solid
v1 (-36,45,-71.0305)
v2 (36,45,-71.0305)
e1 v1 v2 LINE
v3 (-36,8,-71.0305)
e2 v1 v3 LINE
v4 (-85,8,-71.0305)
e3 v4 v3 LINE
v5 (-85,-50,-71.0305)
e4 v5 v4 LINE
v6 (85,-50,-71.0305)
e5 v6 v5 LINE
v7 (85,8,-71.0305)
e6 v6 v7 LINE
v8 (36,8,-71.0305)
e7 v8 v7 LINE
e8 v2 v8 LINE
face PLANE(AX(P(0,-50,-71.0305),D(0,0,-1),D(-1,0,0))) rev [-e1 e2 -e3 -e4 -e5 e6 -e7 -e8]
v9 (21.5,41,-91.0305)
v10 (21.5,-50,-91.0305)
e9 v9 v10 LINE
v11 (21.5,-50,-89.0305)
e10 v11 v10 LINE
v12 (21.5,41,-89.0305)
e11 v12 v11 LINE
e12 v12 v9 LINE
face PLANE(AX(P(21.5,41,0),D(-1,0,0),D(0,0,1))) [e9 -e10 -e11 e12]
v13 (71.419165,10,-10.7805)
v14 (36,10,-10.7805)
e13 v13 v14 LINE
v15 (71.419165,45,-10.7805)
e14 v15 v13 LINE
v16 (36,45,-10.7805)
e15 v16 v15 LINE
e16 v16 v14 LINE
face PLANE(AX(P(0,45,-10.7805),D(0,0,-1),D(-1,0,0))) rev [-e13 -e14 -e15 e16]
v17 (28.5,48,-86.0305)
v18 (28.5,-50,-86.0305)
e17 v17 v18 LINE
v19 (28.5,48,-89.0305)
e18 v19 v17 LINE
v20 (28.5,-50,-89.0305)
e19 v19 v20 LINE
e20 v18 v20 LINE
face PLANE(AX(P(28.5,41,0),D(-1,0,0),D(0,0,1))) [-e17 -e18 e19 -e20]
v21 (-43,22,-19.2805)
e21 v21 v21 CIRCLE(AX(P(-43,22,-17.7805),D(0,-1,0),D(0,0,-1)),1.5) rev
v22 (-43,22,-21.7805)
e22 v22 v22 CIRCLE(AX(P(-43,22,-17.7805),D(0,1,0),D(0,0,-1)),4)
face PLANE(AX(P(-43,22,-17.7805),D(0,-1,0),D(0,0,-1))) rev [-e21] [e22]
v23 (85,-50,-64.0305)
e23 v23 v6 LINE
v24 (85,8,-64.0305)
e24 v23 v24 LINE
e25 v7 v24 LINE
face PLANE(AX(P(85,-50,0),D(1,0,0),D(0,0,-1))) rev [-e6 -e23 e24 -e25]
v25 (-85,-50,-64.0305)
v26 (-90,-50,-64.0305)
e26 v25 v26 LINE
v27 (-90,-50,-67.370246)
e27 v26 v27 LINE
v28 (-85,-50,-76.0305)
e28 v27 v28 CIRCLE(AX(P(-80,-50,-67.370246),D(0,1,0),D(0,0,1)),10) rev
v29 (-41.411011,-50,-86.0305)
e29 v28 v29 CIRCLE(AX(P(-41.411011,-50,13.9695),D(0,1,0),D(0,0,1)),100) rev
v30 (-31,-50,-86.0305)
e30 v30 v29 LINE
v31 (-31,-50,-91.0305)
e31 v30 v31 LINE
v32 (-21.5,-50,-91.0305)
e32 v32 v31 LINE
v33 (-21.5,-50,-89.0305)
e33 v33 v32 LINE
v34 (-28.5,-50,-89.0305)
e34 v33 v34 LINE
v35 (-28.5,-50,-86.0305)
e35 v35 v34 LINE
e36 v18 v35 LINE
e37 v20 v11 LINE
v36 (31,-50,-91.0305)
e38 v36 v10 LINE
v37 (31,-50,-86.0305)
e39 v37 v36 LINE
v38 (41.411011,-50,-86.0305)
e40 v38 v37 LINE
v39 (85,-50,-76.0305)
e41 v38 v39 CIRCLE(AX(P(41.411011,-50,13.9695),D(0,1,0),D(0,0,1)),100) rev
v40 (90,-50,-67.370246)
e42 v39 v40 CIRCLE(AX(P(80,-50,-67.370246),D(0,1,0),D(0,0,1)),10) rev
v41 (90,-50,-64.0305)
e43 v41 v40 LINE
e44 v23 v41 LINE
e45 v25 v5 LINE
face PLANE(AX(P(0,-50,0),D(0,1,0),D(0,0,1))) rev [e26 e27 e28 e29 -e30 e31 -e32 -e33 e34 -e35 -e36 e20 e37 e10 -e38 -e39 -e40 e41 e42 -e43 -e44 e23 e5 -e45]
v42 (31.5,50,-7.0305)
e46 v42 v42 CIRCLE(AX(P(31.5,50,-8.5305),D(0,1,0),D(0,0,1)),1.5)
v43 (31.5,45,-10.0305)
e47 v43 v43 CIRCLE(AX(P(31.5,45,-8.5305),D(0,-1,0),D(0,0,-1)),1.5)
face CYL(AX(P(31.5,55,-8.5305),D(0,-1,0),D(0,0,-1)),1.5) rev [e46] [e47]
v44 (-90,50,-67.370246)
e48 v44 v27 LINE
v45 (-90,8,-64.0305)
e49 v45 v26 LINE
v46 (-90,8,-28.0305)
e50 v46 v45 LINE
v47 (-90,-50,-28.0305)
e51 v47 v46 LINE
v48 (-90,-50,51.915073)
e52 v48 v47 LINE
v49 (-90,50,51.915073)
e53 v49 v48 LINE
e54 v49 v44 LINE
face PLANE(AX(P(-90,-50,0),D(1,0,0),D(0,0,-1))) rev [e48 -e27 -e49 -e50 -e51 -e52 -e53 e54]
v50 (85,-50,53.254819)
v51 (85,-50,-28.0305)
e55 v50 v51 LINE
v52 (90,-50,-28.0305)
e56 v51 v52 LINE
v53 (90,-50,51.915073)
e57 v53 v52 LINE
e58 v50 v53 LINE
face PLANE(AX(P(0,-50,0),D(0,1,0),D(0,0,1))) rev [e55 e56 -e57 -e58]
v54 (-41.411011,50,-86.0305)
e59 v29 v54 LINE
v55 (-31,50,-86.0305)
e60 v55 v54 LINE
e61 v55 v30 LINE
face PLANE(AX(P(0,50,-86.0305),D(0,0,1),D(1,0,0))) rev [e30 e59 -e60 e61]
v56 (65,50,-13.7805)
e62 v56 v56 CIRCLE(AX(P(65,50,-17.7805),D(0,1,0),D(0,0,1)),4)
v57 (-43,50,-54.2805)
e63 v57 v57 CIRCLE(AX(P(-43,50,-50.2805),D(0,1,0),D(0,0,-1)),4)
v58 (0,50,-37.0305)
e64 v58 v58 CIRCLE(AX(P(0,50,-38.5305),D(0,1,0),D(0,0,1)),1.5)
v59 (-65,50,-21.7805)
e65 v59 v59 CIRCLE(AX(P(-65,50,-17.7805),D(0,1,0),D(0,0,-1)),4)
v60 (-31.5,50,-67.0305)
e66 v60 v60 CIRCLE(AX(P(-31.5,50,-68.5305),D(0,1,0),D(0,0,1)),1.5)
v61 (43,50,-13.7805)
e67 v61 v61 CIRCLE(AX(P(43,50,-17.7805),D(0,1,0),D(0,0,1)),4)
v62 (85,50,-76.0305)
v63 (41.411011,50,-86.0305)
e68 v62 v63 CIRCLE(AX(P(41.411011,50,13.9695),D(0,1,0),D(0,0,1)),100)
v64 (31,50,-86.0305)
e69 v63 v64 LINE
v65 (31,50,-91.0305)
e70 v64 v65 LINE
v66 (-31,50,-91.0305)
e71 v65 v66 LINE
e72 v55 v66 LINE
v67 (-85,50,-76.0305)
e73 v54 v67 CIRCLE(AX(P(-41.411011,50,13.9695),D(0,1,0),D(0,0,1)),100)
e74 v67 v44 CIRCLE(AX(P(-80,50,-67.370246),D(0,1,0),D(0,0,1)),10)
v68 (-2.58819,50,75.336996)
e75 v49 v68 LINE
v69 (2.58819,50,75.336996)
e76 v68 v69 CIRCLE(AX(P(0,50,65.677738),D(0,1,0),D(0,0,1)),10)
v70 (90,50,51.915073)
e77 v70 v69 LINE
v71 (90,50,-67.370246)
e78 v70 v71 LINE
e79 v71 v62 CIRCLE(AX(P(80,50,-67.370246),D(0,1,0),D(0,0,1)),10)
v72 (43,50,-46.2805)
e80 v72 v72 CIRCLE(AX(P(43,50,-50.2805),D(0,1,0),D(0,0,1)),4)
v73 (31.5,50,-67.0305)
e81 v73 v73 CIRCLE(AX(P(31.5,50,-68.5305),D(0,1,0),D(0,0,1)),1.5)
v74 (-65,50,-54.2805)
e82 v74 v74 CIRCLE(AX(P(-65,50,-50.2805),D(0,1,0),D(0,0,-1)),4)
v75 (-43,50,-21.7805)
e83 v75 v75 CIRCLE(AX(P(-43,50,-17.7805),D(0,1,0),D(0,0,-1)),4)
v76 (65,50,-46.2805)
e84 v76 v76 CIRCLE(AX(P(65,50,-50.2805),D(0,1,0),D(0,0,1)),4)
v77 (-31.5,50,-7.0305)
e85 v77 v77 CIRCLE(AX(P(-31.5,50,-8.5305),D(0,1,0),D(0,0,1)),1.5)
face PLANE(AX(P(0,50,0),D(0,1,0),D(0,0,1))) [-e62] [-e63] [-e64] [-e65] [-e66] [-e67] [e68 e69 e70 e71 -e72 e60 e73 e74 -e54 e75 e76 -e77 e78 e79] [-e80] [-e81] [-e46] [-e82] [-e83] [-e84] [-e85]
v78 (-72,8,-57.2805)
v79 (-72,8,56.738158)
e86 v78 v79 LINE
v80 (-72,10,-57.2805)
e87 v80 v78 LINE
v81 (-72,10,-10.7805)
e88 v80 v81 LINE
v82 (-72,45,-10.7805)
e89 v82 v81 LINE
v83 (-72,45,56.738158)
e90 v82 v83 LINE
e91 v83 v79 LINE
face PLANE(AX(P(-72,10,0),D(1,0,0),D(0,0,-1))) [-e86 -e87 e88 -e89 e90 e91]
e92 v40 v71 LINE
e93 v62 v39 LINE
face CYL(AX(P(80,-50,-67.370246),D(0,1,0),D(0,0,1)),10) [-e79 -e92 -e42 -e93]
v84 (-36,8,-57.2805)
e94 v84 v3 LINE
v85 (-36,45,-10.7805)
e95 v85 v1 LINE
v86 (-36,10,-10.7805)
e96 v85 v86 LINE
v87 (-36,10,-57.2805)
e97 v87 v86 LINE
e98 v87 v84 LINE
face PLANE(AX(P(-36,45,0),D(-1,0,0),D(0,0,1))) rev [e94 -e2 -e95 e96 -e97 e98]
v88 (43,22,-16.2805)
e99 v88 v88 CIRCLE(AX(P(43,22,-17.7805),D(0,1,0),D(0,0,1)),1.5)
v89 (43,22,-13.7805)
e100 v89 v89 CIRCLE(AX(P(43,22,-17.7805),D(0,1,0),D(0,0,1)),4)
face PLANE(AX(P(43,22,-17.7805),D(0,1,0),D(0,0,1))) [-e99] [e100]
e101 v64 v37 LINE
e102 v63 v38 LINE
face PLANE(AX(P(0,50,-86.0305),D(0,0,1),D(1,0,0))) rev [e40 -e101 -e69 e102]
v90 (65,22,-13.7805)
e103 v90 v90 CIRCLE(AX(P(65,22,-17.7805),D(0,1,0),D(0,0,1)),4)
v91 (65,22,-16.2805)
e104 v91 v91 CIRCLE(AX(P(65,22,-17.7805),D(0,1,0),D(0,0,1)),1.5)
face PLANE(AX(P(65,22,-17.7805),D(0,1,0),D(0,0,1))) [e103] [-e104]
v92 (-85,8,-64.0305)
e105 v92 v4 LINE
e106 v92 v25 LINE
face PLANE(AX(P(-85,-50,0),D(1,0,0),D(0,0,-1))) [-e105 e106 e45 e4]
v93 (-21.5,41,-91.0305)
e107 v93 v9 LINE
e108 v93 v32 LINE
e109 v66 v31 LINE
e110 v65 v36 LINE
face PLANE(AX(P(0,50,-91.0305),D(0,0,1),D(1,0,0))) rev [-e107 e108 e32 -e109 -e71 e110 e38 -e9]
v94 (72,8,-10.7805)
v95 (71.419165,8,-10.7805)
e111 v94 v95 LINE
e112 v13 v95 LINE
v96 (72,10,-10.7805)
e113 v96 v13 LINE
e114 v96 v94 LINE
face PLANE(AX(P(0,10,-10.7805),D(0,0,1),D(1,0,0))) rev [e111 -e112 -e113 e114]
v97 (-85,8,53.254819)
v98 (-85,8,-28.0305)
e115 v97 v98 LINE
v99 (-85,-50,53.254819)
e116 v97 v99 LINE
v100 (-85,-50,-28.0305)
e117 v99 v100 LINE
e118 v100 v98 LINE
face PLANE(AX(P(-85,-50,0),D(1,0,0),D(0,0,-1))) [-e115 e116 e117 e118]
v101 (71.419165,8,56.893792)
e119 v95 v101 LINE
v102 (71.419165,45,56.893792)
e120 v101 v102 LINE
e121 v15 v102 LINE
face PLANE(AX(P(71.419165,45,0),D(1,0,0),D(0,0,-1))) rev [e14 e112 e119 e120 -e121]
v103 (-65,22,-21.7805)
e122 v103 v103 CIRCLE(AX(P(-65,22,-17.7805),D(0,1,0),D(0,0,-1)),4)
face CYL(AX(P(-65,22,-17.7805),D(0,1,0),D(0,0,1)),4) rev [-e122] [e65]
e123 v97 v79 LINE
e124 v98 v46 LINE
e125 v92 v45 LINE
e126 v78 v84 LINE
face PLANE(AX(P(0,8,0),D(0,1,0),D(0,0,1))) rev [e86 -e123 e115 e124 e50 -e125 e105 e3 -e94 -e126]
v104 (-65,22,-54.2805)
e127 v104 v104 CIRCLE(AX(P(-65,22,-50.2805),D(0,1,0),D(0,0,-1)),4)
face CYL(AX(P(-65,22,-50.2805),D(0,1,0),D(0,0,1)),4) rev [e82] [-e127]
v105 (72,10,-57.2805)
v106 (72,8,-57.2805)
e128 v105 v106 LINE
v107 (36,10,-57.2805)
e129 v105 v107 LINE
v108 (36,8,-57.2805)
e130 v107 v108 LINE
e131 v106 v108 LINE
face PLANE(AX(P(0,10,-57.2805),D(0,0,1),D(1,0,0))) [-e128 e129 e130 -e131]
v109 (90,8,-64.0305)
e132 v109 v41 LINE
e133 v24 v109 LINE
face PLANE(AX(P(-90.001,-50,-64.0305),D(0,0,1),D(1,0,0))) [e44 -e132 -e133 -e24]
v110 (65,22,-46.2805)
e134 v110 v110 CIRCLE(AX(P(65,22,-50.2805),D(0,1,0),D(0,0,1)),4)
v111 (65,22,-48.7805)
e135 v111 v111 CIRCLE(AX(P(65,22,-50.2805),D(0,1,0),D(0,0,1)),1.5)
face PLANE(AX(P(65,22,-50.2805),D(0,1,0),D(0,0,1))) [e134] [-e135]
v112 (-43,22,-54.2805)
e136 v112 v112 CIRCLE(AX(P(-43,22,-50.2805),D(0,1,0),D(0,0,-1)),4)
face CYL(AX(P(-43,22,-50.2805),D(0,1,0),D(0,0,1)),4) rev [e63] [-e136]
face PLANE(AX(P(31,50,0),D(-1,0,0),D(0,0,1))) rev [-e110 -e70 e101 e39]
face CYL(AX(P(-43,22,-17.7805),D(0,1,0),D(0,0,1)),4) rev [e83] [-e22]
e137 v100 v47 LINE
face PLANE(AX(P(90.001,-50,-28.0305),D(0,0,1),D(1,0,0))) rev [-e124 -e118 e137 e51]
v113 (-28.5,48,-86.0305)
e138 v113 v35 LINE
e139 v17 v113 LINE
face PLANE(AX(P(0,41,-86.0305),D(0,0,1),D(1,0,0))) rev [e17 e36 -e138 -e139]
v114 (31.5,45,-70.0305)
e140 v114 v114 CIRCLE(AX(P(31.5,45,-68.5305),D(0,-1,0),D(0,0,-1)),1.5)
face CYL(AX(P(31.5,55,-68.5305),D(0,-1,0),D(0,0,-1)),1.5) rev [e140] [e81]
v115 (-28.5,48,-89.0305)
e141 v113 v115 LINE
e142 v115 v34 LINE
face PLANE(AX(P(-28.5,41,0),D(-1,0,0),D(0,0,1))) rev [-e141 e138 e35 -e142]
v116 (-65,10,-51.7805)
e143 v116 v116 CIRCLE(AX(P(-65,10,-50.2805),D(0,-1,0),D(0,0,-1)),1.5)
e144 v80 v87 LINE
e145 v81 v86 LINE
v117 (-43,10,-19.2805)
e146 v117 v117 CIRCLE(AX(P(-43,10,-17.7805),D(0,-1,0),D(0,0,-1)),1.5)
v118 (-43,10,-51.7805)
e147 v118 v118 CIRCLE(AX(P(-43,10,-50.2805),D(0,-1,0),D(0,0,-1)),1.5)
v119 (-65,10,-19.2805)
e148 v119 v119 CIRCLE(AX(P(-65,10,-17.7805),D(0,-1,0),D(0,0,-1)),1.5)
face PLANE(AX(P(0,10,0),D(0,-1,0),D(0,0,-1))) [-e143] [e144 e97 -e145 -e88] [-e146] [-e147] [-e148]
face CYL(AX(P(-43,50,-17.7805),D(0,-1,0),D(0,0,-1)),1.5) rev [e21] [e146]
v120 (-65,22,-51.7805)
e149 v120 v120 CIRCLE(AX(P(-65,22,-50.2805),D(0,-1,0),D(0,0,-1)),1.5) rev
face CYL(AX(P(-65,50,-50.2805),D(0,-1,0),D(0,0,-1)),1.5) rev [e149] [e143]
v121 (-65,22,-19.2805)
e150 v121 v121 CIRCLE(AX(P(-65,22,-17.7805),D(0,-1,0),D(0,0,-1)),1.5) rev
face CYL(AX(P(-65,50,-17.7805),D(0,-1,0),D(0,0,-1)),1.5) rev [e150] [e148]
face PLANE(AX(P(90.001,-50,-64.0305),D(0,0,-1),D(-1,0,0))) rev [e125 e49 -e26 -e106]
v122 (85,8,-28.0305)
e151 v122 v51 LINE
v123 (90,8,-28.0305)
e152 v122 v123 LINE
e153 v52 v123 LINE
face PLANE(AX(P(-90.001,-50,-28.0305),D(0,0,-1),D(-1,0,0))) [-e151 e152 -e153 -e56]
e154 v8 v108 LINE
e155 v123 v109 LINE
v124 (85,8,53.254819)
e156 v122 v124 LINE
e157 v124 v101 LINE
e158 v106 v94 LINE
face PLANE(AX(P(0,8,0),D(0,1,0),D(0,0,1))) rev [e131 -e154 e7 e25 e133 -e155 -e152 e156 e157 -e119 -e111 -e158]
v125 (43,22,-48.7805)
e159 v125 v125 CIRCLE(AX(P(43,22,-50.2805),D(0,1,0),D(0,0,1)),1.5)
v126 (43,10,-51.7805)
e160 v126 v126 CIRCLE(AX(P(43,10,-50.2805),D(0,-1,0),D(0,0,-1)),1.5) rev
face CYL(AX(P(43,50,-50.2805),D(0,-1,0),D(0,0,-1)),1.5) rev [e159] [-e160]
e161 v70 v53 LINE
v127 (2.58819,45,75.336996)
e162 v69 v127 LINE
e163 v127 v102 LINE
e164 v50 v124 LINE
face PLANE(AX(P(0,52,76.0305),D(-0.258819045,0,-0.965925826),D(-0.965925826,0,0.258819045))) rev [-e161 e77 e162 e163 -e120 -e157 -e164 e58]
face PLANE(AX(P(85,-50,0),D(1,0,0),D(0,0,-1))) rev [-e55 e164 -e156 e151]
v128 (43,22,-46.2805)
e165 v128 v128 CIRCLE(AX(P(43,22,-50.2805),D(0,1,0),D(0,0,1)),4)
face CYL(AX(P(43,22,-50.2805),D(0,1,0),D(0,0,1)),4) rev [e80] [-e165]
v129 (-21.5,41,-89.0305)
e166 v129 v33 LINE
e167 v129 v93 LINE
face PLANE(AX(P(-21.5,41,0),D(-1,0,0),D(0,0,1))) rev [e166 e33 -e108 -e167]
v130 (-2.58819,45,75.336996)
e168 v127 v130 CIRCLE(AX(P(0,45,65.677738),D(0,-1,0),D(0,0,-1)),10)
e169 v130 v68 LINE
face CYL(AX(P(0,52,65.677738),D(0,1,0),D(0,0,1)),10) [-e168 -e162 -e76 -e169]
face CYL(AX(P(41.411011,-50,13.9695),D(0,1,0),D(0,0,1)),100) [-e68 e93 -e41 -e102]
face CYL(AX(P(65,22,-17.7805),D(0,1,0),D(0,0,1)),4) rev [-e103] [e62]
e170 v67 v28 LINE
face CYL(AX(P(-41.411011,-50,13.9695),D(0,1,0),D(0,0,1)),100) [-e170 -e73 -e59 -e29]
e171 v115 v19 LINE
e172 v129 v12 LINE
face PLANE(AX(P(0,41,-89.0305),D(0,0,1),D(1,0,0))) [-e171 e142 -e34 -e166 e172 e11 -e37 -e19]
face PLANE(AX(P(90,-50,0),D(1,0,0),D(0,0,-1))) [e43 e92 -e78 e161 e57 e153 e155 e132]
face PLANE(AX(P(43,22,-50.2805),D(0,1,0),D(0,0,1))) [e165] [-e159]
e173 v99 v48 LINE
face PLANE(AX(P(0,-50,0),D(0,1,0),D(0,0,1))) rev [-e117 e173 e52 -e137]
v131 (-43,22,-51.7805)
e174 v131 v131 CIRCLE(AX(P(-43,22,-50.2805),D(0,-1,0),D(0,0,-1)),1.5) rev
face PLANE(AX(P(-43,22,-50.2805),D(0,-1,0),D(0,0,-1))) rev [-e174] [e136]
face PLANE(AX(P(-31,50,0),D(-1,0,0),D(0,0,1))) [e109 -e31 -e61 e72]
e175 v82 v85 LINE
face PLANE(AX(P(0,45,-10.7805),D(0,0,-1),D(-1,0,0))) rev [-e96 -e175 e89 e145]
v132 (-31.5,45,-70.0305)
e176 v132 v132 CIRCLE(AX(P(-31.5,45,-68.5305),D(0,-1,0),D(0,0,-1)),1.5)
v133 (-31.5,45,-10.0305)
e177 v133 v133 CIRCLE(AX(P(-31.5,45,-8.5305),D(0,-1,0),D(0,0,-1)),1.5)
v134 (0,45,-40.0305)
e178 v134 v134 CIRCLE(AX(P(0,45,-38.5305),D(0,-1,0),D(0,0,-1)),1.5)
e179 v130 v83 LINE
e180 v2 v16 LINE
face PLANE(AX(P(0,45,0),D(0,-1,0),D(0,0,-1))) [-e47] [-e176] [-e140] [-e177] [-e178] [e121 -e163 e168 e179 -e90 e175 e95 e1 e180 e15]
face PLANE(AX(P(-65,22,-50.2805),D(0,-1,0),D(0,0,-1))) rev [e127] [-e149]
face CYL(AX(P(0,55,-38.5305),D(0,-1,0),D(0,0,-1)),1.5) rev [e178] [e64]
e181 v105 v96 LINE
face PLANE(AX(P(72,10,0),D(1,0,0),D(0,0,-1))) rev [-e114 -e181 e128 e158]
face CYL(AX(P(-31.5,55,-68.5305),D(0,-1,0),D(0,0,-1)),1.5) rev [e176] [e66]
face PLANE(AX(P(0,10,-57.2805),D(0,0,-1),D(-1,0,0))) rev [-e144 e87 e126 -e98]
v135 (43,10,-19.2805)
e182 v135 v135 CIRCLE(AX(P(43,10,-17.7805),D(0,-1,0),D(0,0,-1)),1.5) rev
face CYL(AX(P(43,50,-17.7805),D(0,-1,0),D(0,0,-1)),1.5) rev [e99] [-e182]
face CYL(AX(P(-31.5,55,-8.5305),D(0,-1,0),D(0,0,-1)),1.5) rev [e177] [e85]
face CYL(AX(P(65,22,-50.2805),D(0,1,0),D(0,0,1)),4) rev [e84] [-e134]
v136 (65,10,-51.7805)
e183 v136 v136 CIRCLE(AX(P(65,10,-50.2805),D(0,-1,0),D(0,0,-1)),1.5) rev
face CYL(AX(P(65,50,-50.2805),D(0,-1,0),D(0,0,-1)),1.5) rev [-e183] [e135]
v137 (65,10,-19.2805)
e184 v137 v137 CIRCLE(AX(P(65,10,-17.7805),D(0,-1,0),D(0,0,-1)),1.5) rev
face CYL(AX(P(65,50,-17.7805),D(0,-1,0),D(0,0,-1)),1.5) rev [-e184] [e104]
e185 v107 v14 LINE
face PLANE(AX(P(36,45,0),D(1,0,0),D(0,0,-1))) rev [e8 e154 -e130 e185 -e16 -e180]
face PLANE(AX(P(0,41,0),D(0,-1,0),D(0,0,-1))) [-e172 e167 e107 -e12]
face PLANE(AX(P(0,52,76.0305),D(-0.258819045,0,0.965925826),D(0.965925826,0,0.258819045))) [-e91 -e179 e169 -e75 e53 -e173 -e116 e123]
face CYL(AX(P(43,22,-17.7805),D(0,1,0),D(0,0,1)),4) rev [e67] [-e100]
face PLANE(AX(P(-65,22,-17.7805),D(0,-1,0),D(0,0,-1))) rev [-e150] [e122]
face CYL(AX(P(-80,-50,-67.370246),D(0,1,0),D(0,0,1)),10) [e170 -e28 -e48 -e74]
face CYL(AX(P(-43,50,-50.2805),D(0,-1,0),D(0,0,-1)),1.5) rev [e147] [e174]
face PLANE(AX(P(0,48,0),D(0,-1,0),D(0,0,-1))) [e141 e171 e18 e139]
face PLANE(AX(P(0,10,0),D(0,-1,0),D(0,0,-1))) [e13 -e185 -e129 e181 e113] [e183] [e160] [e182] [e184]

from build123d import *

# Parameters (mm, degrees)
BOSS_EXTRUDE1_DEPTH      = 50
BOSS_EXTRUDE1_DEPTH_BACK = 50
SKETCH1_W                = 180
SKETCH1_H                = 152.061
SHELL1_T                 = -5
SKETCH3_W                = 170
SKETCH3_H                = 142.061
BOSS_EXTRUDE2_DEPTH      = 37
CUT_EXTRUDE1_REACH       = 203.694
SKETCH2_W                = 36
SKETCH2_H                = 58
SKETCH4_W                = 36
SKETCH4_H                = 46.5
SKETCH4_R                = 1.5
CUT_EXTRUDE2_DEPTH       = 2
SKETCH4_3_R              = 1.5
CUT_EXTRUDE3_DEPTH       = 132.318836921
SKETCH5_W                = 159.952904784
SKETCH5_H                = 5
CUT_EXTRUDE4_DEPTH       = 63
SKETCH8_W                = 72
SKETCH8_H                = 29.937457508
CUT_EXTRUDE5_DEPTH       = 37
SKETCH9_R                = 1.5
CUT_EXTRUDE6_DEPTH       = 10
CUT_EXTRUDE7_DEPTH       = 102
FILLET1_R                = 10
SKETCH11_W               = 62
SKETCH11_H               = 5
BOSS_EXTRUDE3_DEPTH      = 100
SKETCH12_W               = 57
SKETCH12_H               = 3
SKETCH12_W_2             = 43
SKETCH12_H_2             = 2
CUT_EXTRUDE8_DEPTH       = 91
SKETCH13_W               = 57
SKETCH13_H               = 3
CUT_EXTRUDE9_DEPTH       = 7
FILLET2_R                = 10
FILLET3_R                = 100
SKETCH15_R               = 4
CUT_EXTRUDE10_DEPTH      = 28


with BuildPart() as part:
    # Sketch1 → Boss-Extrude1 (new, two sides: drawn at the far end of the back side and taken through both)
    with BuildSketch(Plane(origin=(0, 0, 0), x_dir=(1, 0, 0), z_dir=(0, 1, 0)).offset(-BOSS_EXTRUDE1_DEPTH_BACK)):
        Rectangle(SKETCH1_W, SKETCH1_H)
    extrude(amount=BOSS_EXTRUDE1_DEPTH + BOSS_EXTRUDE1_DEPTH_BACK)

    # Shell1
    shell1_openings = [part.faces().sort_by_distance(p)[0] for p in [
        (0, -50, 0),
    ]]
    offset(amount=SHELL1_T, openings=shell1_openings, kind=Kind.INTERSECTION)

    # Sketch3 → Boss-Extrude2 (add)
    with BuildSketch(Plane.XZ.offset(-45)):
        Rectangle(SKETCH3_W, SKETCH3_H)
    extrude(amount=BOSS_EXTRUDE2_DEPTH)

    # Sketch2 → Cut-Extrude1 (cut, up to next)
    with BuildSketch(Plane.ZY.offset(90), mode=Mode.PRIVATE) as cut_extrude1_sk1:
        with Locations((-46.0305, -21)):
            Rectangle(SKETCH2_W, SKETCH2_H)
    cut_extrude1_tool1 = extrude(cut_extrude1_sk1.sketch, amount=-CUT_EXTRUDE1_REACH, mode=Mode.PRIVATE) & part.part
    cut_extrude1 = cut_extrude1_tool1.solids().sort_by_distance((-90, -21, -46.0305))[0]
    add(cut_extrude1, mode=Mode.SUBTRACT)

    # Mirror1: Cut-Extrude1 across plane
    add(cut_extrude1.mirror(Plane(origin=(0, 0, 0), x_dir=(0, 0, 1), z_dir=(1, 0, 0))), mode=Mode.SUBTRACT)

    # Sketch4 → Cut-Extrude2 (cut)
    with BuildSketch(Plane.XZ.offset(-8)):
        with Locations((-54, -34.0305)):
            Rectangle(SKETCH4_W, SKETCH4_H)
        with Locations(Location((-43, -50.2805, 0), (0, 0, 270))):
            Circle(SKETCH4_R, mode=Mode.SUBTRACT)
        with Locations(Location((-65, -50.2805, 0), (0, 0, 270))):
            Circle(SKETCH4_R, mode=Mode.SUBTRACT)
        with Locations(Location((-43, -17.7805, 0), (0, 0, 270))):
            Circle(SKETCH4_R, mode=Mode.SUBTRACT)
        with Locations(Location((-65, -17.7805, 0), (0, 0, 270))):
            Circle(SKETCH4_R, mode=Mode.SUBTRACT)
    cut_extrude2 = extrude(amount=-CUT_EXTRUDE2_DEPTH, mode=Mode.SUBTRACT)

    # Sketch4<3> → Cut-Extrude3 (cut, through all)
    with BuildSketch(Plane.XZ.offset(-8)):
        with BuildLine():
            Line((-65, -19.2805), (-65, -17.7805))
            Line((-65, -17.7805), (-63.5, -17.7805))
            ThreePointArc((-63.5, -17.7805), (-66.060660172, -16.719839828), (-65, -19.2805))
        make_face()
        with BuildLine():
            Line((-63.5, -17.7805), (-65, -17.7805))
            Line((-65, -17.7805), (-65, -19.2805))
            ThreePointArc((-65, -19.2805), (-63.939339828, -18.841160172), (-63.5, -17.7805))
        make_face()
        with BuildLine():
            Line((-65, -19.2805), (-65, -17.7805))
            Line((-65, -17.7805), (-63.5, -17.7805))
            ThreePointArc((-63.5, -17.7805), (-66.060660172, -16.719839828), (-65, -19.2805))
        make_face()
        with BuildLine():
            Line((-63.5, -17.7805), (-65, -17.7805))
            Line((-65, -17.7805), (-65, -19.2805))
            ThreePointArc((-65, -19.2805), (-63.939339828, -18.841160172), (-63.5, -17.7805))
        make_face()
        with Locations(Location((-43, -17.7805, 0), (0, 0, 270))):
            Circle(SKETCH4_3_R)
        with Locations(Location((-65, -50.2805, 0), (0, 0, 270))):
            Circle(SKETCH4_3_R)
        with Locations(Location((-43, -50.2805, 0), (0, 0, 270))):
            Circle(SKETCH4_3_R)
    cut_extrude3 = extrude(amount=-CUT_EXTRUDE3_DEPTH, mode=Mode.SUBTRACT)

    # Mirror2: Cut-Extrude2, Cut-Extrude3 across plane
    add(cut_extrude2.mirror(Plane(origin=(0, 0, 0), x_dir=(0, 0, 1), z_dir=(1, 0, 0))), mode=Mode.SUBTRACT)
    add(cut_extrude3.mirror(Plane(origin=(0, 0, 0), x_dir=(0, 0, 1), z_dir=(1, 0, 0))), mode=Mode.SUBTRACT)

    # Sketch5 → Cut-Extrude4 (cut)
    with BuildSketch(Plane.XZ.offset(-8)):
        with Locations((5.023547608, 73.5305)):
            Rectangle(SKETCH5_W, SKETCH5_H)
    extrude(amount=CUT_EXTRUDE4_DEPTH, mode=Mode.SUBTRACT)

    # Sketch8 → Cut-Extrude5 (cut)
    with BuildSketch(Plane.XZ.offset(-8)):
        Polygon((-36, -71.0305), (36, -71.0305), (36, -57.2805), (36, -10.7805), (-36, -10.7805), (-36, -57.2805), align=None)
        with Locations((0, 4.188228754)):
            Rectangle(SKETCH8_W, SKETCH8_H)
        Polygon((36, 19.156957508), (36, -10.7805), (71.419165144, -10.7805), (71.419165144, 76.0305), (-72, 76.0305), (-72, -10.7805), (-36, -10.7805), (-36, 19.156957508), align=None)
    extrude(amount=-CUT_EXTRUDE5_DEPTH, mode=Mode.SUBTRACT)

    # Sketch9 → Cut-Extrude6 (cut)
    with BuildSketch(Plane.XZ.offset(-45)):
        with Locations(Location((31.5, -68.5305, 0), (0, 0, 270))):
            Circle(SKETCH9_R)
        with Locations(Location((-31.5, -68.5305, 0), (0, 0, 270))):
            Circle(SKETCH9_R)
        with Locations(Location((31.5, -8.5305, 0), (0, 0, 270))):
            Circle(SKETCH9_R)
        with Locations(Location((-31.5, -8.5305, 0), (0, 0, 270))):
            Circle(SKETCH9_R)
        with Locations(Location((0, -38.5305, 0), (0, 0, 270))):
            Circle(SKETCH9_R)
    extrude(amount=-CUT_EXTRUDE6_DEPTH, mode=Mode.SUBTRACT)

    # Sketch10 → Cut-Extrude7 (cut)
    with BuildSketch(Plane.XZ.offset(50)):
        Polygon((0, 76.0305), (90, 51.915072681), (90, 76.0305), align=None)
    cut_extrude7 = extrude(amount=-CUT_EXTRUDE7_DEPTH, mode=Mode.SUBTRACT)

    # Mirror3: Cut-Extrude7 across plane
    add(cut_extrude7.mirror(Plane(origin=(0, 0, 0), x_dir=(0, 0, 1), z_dir=(1, 0, 0))), mode=Mode.SUBTRACT)

    # Fillet1
    fillet1_edges = [part.edges().sort_by_distance(p)[0] for p in [
        (0, 47.5, 76.0305),
    ]]
    fillet(fillet1_edges, radius=FILLET1_R)

    # Sketch11 → Boss-Extrude3 (add)
    with BuildSketch(Plane.XZ.offset(50)):
        Polygon((85, -86.0305), (85, -76.0305), (-85, -76.0305), (-85, -86.0305), (-31, -86.0305), (31, -86.0305), align=None)
        with Locations((0, -88.5305)):
            Rectangle(SKETCH11_W, SKETCH11_H)
    extrude(amount=-BOSS_EXTRUDE3_DEPTH)

    # Sketch12 → Cut-Extrude8 (cut)
    with BuildSketch(Plane.XZ.offset(50)):
        with Locations((0, -87.5305)):
            Rectangle(SKETCH12_W, SKETCH12_H)
        with Locations((0, -90.0305)):
            Rectangle(SKETCH12_W_2, SKETCH12_H_2)
    extrude(amount=-CUT_EXTRUDE8_DEPTH, mode=Mode.SUBTRACT)

    # Sketch13 → Cut-Extrude9 (cut)
    with BuildSketch(Plane.XZ.offset(-41)):
        with Locations((0, -87.5305)):
            Rectangle(SKETCH13_W, SKETCH13_H)
    extrude(amount=-CUT_EXTRUDE9_DEPTH, mode=Mode.SUBTRACT)

    # Fillet2
    # the kernel refuses this fillet: 10 mm, written as the material it takes off along each edge
    with BuildSketch(Plane(origin=(90, -71.650635095, -76.0305), x_dir=(0, 0, 1), z_dir=(0, 1, 0))) as fillet2_piece_1:
        with BuildLine():
            CenterArc((8.660254038, -10), FILLET2_R, 90, 60)
            Line((0, -5), (-0.173205081, -4.9))
            ThreePointArc((-0.173205081, -4.9), (-0.2, -2.5), (-0.2, 0))
            Line((-0.2, 0), (0, 0.2))
            Line((0, 0.2), (8.660254038, 0.2))
            Line((8.660254038, 0.2), (8.660254038, 0))
        make_face()
    extrude(amount=143.301270189, mode=Mode.SUBTRACT)
    with BuildSketch(Plane(origin=(-90, 71.650635095, -76.0305), x_dir=(1, 0, 0), z_dir=(0, -1, 0))) as fillet2_piece_2:
        with BuildLine():
            CenterArc((10, 8.660254038), FILLET2_R, 180, 60)
            Line((0, 8.660254038), (-0.2, 8.660254038))
            Line((-0.2, 8.660254038), (-0.2, 0))
            Line((-0.2, 0), (0, -0.2))
            ThreePointArc((0, -0.2), (2.5, -0.2), (4.9, -0.173205081))
            Line((4.9, -0.173205081), (5, 0))
        make_face()
    extrude(amount=143.301270189, mode=Mode.SUBTRACT)

    # Fillet3
    # the kernel refuses this fillet: 100 mm, written as the material it takes off along each edge
    with BuildSketch(Plane(origin=(-85, -158.972473589, -86.0305), x_dir=(1, 0, 0), z_dir=(0, 1, 0))) as fillet3_piece_1:
        with BuildLine():
            CenterArc((43.588989435, -100), FILLET3_R, 90, 25.841932763)
            Line((0, -10), (0, 0))
            Line((0, 0), (43.588989435, 0))
        make_face()
    extrude(amount=317.944947177, mode=Mode.SUBTRACT)
    with BuildSketch(Plane(origin=(85, -158.972473589, -86.0305), x_dir=(0, 0, 1), z_dir=(0, 1, 0))) as fillet3_piece_2:
        with BuildLine():
            CenterArc((100, -43.588989435), FILLET3_R, 154.158067237, 25.841932763)
            Line((0, -43.588989435), (0, 0))
            Line((0, 0), (10, 0))
        make_face()
    extrude(amount=317.944947177, mode=Mode.SUBTRACT)

    # Sketch15 → Cut-Extrude10 (cut)
    with BuildSketch(Plane(origin=(0, 50, 0), x_dir=(1, 0, 0), z_dir=(0, 1, 0))):
        with Locations(Location((65, 17.7805, 0), (0, 0, 270))):
            Circle(SKETCH15_R)
        with Locations(Location((43, 17.7805, 0), (0, 0, 270))):
            Circle(SKETCH15_R)
        with Locations(Location((65, 50.2805, 0), (0, 0, 270))):
            Circle(SKETCH15_R)
        with Locations(Location((-43, 50.2805, 0), (0, 0, 90))):
            Circle(SKETCH15_R)
        with Locations(Location((43, 50.2805, 0), (0, 0, 270))):
            Circle(SKETCH15_R)
        with Locations(Location((-65, 50.2805, 0), (0, 0, 90))):
            Circle(SKETCH15_R)
        with Locations(Location((-43, 17.7805, 0), (0, 0, 90))):
            Circle(SKETCH15_R)
        with Locations(Location((-65, 17.7805, 0), (0, 0, 90))):
            Circle(SKETCH15_R)
    extrude(amount=-CUT_EXTRUDE10_DEPTH, mode=Mode.SUBTRACT)


solid = part.part
